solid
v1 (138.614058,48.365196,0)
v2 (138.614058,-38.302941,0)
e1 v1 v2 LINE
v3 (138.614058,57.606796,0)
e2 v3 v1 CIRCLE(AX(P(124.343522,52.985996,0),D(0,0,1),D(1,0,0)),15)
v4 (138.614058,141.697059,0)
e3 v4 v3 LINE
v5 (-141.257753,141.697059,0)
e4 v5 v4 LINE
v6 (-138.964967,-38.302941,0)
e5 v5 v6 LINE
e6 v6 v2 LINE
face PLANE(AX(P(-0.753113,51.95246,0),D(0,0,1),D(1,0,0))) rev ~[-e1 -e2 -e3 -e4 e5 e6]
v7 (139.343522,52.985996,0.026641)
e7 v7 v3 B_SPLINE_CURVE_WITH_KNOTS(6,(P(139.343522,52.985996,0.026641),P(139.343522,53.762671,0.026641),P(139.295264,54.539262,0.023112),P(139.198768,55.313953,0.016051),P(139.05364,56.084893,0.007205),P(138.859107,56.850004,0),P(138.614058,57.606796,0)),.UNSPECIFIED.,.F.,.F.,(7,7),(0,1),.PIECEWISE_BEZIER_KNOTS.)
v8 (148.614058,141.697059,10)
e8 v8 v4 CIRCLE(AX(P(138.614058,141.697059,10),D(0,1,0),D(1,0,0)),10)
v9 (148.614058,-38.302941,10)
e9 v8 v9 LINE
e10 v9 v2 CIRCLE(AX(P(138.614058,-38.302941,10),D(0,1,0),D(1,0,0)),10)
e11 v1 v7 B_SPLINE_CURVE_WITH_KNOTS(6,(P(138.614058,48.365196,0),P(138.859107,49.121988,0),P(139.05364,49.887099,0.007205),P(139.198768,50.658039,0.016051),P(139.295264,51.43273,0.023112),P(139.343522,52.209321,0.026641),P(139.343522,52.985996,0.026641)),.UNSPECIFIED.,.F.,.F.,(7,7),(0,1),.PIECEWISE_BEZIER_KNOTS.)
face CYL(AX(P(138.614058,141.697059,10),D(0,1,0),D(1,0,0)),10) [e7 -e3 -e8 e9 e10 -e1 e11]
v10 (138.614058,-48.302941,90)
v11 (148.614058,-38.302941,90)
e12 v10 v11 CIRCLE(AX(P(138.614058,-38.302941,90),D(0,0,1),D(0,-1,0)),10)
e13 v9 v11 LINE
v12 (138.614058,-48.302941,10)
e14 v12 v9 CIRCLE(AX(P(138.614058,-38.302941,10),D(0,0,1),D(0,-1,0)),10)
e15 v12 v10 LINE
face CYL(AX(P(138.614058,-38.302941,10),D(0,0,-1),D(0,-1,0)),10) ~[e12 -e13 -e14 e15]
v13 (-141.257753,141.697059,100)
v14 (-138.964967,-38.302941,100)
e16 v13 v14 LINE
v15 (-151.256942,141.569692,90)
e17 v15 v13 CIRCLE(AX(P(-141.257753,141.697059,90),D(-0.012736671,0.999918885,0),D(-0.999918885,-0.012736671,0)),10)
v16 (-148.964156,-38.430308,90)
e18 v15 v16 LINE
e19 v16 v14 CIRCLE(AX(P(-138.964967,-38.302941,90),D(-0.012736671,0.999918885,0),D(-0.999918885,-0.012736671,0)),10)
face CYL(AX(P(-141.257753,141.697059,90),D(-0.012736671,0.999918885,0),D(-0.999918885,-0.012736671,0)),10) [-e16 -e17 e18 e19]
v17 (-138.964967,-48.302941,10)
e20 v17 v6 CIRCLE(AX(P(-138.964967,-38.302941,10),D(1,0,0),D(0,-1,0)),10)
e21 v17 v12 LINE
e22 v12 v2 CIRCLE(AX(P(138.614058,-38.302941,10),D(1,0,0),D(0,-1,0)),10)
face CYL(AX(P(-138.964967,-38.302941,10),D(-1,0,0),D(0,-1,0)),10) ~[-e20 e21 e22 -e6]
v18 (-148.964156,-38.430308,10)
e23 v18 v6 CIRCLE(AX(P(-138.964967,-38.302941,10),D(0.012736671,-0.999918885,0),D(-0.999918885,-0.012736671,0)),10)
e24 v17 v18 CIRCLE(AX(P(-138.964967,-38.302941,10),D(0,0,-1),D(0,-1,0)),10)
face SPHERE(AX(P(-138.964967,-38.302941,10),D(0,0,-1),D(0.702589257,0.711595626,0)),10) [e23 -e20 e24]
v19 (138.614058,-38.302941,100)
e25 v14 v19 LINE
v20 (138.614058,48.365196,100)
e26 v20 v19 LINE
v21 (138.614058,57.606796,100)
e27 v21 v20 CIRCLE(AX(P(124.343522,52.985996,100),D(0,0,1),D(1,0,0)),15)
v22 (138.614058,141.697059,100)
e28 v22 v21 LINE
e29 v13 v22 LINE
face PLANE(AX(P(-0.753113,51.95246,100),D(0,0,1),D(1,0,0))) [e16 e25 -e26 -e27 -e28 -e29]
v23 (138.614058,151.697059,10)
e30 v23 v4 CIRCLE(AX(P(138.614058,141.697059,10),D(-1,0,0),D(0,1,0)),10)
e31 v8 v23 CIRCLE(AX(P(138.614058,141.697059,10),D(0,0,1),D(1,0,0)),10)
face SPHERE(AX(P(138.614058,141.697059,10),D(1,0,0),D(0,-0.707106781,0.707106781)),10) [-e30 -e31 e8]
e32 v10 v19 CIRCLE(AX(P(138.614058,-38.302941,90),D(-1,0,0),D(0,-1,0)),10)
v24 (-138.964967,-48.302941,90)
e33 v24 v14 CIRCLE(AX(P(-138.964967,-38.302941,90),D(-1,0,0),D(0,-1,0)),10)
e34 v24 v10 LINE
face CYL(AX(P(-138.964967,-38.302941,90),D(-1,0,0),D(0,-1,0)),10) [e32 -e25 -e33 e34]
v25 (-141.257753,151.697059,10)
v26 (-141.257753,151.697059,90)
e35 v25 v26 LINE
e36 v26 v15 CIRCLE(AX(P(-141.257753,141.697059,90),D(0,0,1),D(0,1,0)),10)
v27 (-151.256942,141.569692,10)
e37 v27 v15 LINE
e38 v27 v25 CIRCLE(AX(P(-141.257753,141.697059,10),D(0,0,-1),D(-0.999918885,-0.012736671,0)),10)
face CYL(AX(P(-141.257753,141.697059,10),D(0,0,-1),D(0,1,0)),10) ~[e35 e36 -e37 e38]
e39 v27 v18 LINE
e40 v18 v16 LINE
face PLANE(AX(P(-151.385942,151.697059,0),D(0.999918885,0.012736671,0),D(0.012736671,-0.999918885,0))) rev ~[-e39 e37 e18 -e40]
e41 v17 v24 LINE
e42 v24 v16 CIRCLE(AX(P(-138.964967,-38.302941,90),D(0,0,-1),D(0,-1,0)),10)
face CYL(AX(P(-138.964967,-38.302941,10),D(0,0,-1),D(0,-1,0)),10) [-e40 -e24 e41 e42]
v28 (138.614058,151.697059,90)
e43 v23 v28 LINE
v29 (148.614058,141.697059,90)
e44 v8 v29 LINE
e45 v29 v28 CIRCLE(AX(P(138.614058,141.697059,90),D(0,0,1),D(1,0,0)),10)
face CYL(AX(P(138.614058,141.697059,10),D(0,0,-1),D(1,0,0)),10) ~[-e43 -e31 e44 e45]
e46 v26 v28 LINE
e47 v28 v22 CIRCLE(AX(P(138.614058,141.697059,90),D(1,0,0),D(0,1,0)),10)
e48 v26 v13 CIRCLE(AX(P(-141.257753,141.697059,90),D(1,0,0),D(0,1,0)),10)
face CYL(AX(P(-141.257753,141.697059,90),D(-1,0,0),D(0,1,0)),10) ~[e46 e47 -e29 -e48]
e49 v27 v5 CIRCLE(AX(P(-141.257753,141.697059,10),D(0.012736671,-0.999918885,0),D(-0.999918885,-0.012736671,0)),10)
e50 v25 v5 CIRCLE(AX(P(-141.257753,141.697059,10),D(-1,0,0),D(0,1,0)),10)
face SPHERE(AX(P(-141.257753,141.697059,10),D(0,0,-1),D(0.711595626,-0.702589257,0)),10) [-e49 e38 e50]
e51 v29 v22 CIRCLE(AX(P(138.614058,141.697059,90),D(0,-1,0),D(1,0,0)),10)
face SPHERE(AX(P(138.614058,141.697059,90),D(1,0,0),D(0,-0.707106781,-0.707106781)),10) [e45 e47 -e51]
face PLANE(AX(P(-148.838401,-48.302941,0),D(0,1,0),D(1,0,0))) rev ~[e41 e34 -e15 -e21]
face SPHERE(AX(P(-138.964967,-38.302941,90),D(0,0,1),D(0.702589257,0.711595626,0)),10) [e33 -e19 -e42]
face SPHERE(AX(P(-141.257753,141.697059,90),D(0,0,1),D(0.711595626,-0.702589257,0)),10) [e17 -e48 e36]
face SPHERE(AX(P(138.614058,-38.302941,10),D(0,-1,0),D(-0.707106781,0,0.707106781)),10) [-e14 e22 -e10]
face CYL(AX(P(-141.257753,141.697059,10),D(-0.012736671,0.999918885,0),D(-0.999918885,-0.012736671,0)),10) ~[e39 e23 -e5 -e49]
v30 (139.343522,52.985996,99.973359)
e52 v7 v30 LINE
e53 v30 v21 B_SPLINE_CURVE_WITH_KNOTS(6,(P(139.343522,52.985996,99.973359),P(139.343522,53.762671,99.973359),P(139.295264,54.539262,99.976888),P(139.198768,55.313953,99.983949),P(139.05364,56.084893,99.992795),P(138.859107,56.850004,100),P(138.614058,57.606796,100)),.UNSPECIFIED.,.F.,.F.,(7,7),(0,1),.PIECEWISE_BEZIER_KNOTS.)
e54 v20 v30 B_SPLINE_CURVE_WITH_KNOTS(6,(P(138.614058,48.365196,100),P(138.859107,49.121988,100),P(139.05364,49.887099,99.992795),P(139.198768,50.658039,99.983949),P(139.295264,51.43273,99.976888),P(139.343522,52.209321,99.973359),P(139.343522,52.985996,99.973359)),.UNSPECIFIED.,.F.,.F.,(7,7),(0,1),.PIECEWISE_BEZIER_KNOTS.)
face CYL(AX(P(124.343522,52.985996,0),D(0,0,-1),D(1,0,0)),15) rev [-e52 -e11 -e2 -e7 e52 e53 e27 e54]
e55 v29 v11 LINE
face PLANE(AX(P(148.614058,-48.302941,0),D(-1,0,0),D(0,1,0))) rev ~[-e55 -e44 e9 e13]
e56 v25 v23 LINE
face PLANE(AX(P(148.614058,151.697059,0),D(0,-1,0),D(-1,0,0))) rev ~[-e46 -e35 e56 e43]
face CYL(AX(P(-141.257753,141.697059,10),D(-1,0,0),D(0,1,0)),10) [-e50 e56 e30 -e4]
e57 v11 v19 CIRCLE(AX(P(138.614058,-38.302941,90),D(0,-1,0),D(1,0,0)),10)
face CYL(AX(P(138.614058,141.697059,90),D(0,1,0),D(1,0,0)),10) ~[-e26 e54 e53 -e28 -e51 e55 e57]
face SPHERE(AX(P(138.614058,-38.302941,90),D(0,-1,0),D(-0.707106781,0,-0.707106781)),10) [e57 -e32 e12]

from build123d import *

# Parameters (mm, degrees)
F0_R         = 15
F1_DEPTH     = 100
F2_T1_DEPTH  = 180
F2_T3_DEPTH  = 277.5790250274
F2_T5_DEPTH  = 80
F2_T7_DEPTH  = 279.8718117474
F2_T9_DEPTH  = 180.014601827
F2_S13_W     = 10
F2_S13_H     = 10
F2_T14_DEPTH = 10
F2_S19_W     = 10
F2_S19_H     = 10
F2_T20_DEPTH = 10
F2_T26_DEPTH = 10
F2_S31_W     = 10
F2_S31_H     = 10
F2_T32_DEPTH = 10
F2_T38_DEPTH = 10
F2_S43_W     = 10
F2_S43_H     = 10
F2_T44_DEPTH = 10
F2_T50_DEPTH = 10
F2_T56_DEPTH = 10


# Not quite as in the source:
# - a fillet or chamfer that OpenCascade refuses, or shapes differently, is made with other operations: its cross-section is extruded or revolved along the edge and cut away or added


with BuildPart() as f1:
    # F0 (on Top) → F1 (new body)
    with BuildSketch(Plane.XY):
        Polygon((148.6140583592, 151.6970589757), (-151.3859416408, 151.6970589757), (-148.8384008408, -48.3029410243), (148.6140583592, -48.3029410243), align=None)
        with Locations((124.343521893, 52.9859960079)):
            Circle(F0_R, mode=Mode.SUBTRACT)
    extrude(amount=F1_DEPTH)

    # F2: fillet of radius 10 on 12 edges, made by hand

    # F2_s2 → F2_t1 (cut)
    with BuildSketch(Plane.XZ.offset(-141.6970589757)):
        with BuildLine():
            ThreePointArc((148.6140583592, 90), (145.6851261711, 97.0710678119), (138.6140583592, 100))
            Line((138.6140583592, 100), (148.6140583592, 100))
            Line((148.6140583592, 100), (148.6140583592, 90))
        make_face()
        with BuildLine():
            ThreePointArc((148.6140583592, 10), (145.6851261711, 2.9289321881), (138.6140583592, 0))
            Line((138.6140583592, 0), (148.6140583592, 0))
            Line((148.6140583592, 0), (148.6140583592, 10))
        make_face()
    extrude(amount=F2_T1_DEPTH, mode=Mode.SUBTRACT)

    # F2_s4 → F2_t3 (cut)
    with BuildSketch(Plane.YZ.offset(-138.9649666681)):
        with BuildLine():
            ThreePointArc((-48.3029410243, 90), (-45.3740088362, 97.0710678119), (-38.3029410243, 100))
            Line((-38.3029410243, 100), (-48.3029410243, 100))
            Line((-48.3029410243, 100), (-48.3029410243, 90))
        make_face()
        with BuildLine():
            ThreePointArc((-48.3029410243, 10), (-45.3740088362, 2.9289321881), (-38.3029410243, 0))
            Line((-38.3029410243, 0), (-48.3029410243, 0))
            Line((-48.3029410243, 0), (-48.3029410243, 10))
        make_face()
    extrude(amount=F2_T3_DEPTH, mode=Mode.SUBTRACT)

    # F2_s6 → F2_t5 (cut)
    with BuildSketch(Plane.XY.offset(10)):
        with BuildLine():
            ThreePointArc((138.6140583592, -48.3029410243), (145.6851261711, -45.3740088362), (148.6140583592, -38.3029410243))
            Line((148.6140583592, -38.3029410243), (148.6140583592, -48.3029410243))
            Line((148.6140583592, -48.3029410243), (138.6140583592, -48.3029410243))
        make_face()
        with BuildLine():
            ThreePointArc((148.6140583592, 141.6970589757), (145.6851261711, 148.7681267876), (138.6140583592, 151.6970589757))
            Line((138.6140583592, 151.6970589757), (148.6140583592, 151.6970589757))
            Line((148.6140583592, 151.6970589757), (148.6140583592, 141.6970589757))
        make_face()
        with BuildLine():
            ThreePointArc((-138.9649666681, -48.3029410243), (-145.9908592421, -45.4188972875), (-148.9641555213, -38.4303077322))
            Line((-148.9641555213, -38.4303077322), (-148.8384008408, -48.3029410243))
            Line((-148.8384008408, -48.3029410243), (-138.9649666681, -48.3029410243))
        make_face()
        with BuildLine():
            ThreePointArc((-141.2577533882, 151.6970589757), (-148.3737096513, 148.7229515496), (-151.2569422414, 141.5696922678))
            Line((-151.2569422414, 141.5696922678), (-151.3859416408, 151.6970589757))
            Line((-151.3859416408, 151.6970589757), (-141.2577533882, 151.6970589757))
        make_face()
    extrude(amount=F2_T5_DEPTH, mode=Mode.SUBTRACT)

    # F2_s8 → F2_t7 (cut)
    with BuildSketch(Plane.YZ.offset(-141.2577533882)):
        with BuildLine():
            ThreePointArc((151.6970589757, 10), (148.7681267876, 2.9289321881), (141.6970589757, 0))
            Line((141.6970589757, 0), (151.6970589757, 0))
            Line((151.6970589757, 0), (151.6970589757, 10))
        make_face()
        with BuildLine():
            ThreePointArc((151.6970589757, 90), (148.7681267876, 97.0710678119), (141.6970589757, 100))
            Line((141.6970589757, 100), (151.6970589757, 100))
            Line((151.6970589757, 100), (151.6970589757, 90))
        make_face()
    extrude(amount=F2_T7_DEPTH, mode=Mode.SUBTRACT)

    # F2_s10 → F2_t9 (cut)
    with BuildSketch(Plane(origin=(-1.8275176256, 143.4730800475, 0), x_dir=(0, 0, 1), z_dir=(0.0127366708, -0.9999188853, 0))):
        with BuildLine():
            ThreePointArc((10, 149.4415465191), (2.9289321881, 146.512614331), (0, 139.4415465191))
            Line((0, 139.4415465191), (0, 149.4415465191))
            Line((0, 149.4415465191), (10, 149.4415465191))
        make_face()
        with BuildLine():
            ThreePointArc((90, 149.4415465191), (97.0710678119, 146.512614331), (100, 139.4415465191))
            Line((100, 139.4415465191), (100, 149.4415465191))
            Line((100, 149.4415465191), (90, 149.4415465191))
        make_face()
    extrude(amount=F2_T9_DEPTH, mode=Mode.SUBTRACT)


with BuildPart() as f2_tool12:
    # F2_s13 → F2_t14 (new body)
    with BuildSketch(Plane.XZ.offset(38.3029410243)):
        with Locations((143.6140583592, 95)):
            Rectangle(F2_S13_W, F2_S13_H)
    extrude(amount=F2_T14_DEPTH)

    # F2_s15 → F2_t16 (revolve, cut)
    with BuildSketch(Plane(origin=(138.6140583592, -38.3029410243, 90), x_dir=(-0.7071067812, 0, -0.7071067812), z_dir=(-0.7071067812, 0, 0.7071067812))):
        with BuildLine():
            ThreePointArc((0, -10), (10, 0), (0, 10))
            Line((0, 10), (0, -10))
        make_face()
    revolve(axis=Axis((138.6140583592, -38.3029410243, 90), (0, -1, 0)), mode=Mode.SUBTRACT)


with BuildPart() as f1_1:
    add(f1.part)

    # F2_t11: cut F2_tool12
    add(f2_tool12.part, mode=Mode.SUBTRACT)


with BuildPart() as f2_tool18:
    # F2_s19 → F2_t20 (new body)
    with BuildSketch(Plane.YZ.offset(138.6140583592)):
        with Locations((146.6970589757, 95)):
            Rectangle(F2_S19_W, F2_S19_H)
    extrude(amount=F2_T20_DEPTH)

    # F2_s21 → F2_t22 (revolve, cut)
    with BuildSketch(Plane(origin=(138.6140583592, 141.6970589757, 90), x_dir=(0, -0.7071067812, -0.7071067812), z_dir=(0, -0.7071067812, 0.7071067812))):
        with BuildLine():
            ThreePointArc((0, -10), (10, 0), (0, 10))
            Line((0, 10), (0, -10))
        make_face()
    revolve(axis=Axis((138.6140583592, 141.6970589757, 90), (1, 0, 0)), mode=Mode.SUBTRACT)


with BuildPart() as f1_2:
    add(f1_1.part)

    # F2_t17: cut F2_tool18
    add(f2_tool18.part, mode=Mode.SUBTRACT)


with BuildPart() as f2_tool24:
    # F2_s25 → F2_t26 (new body)
    with BuildSketch(Plane.XY.offset(90)):
        Polygon((-138.9649666681, -38.3029410243), (-138.9649666681, -48.3029410243), (-148.8384008408, -48.3029410243), (-148.9641555213, -38.4303077322), align=None)
    extrude(amount=F2_T26_DEPTH)

    # F2_s27 → F2_t28 (revolve, cut)
    with BuildSketch(Plane(origin=(-138.9649666681, -38.3029410243, 90), x_dir=(0.7025892574, 0.7115956263, 0), z_dir=(0.7115956263, -0.7025892574, 0))):
        with BuildLine():
            ThreePointArc((0, -10), (10, 0), (0, 10))
            Line((0, 10), (0, -10))
        make_face()
    revolve(axis=Axis((-138.9649666681, -38.3029410243, 90), (0, 0, 1)), mode=Mode.SUBTRACT)


with BuildPart() as f1_3:
    add(f1_2.part)

    # F2_t23: cut F2_tool24
    add(f2_tool24.part, mode=Mode.SUBTRACT)


with BuildPart() as f2_tool30:
    # F2_s31 → F2_t32 (new body)
    with BuildSketch(Plane.XZ.offset(38.3029410243)):
        with Locations((143.6140583592, 5)):
            Rectangle(F2_S31_W, F2_S31_H)
    extrude(amount=F2_T32_DEPTH)

    # F2_s33 → F2_t34 (revolve, cut)
    with BuildSketch(Plane(origin=(138.6140583592, -38.3029410243, 10), x_dir=(-0.7071067812, 0, 0.7071067812), z_dir=(0.7071067812, 0, 0.7071067812))):
        with BuildLine():
            ThreePointArc((0, -10), (10, 0), (0, 10))
            Line((0, 10), (0, -10))
        make_face()
    revolve(axis=Axis((138.6140583592, -38.3029410243, 10), (0, -1, 0)), mode=Mode.SUBTRACT)


with BuildPart() as f1_4:
    add(f1_3.part)

    # F2_t29: cut F2_tool30
    add(f2_tool30.part, mode=Mode.SUBTRACT)


with BuildPart() as f2_tool36:
    # F2_s37 → F2_t38 (new body)
    with BuildSketch(Plane.XY.offset(10)):
        Polygon((-138.9649666681, -38.3029410243), (-138.9649666681, -48.3029410243), (-148.8384008408, -48.3029410243), (-148.9641555213, -38.4303077322), align=None)
    extrude(amount=-F2_T38_DEPTH)

    # F2_s39 → F2_t40 (revolve, cut)
    with BuildSketch(Plane(origin=(-138.9649666681, -38.3029410243, 10), x_dir=(0.7025892574, 0.7115956263, 0), z_dir=(-0.7115956263, 0.7025892574, 0))):
        with BuildLine():
            ThreePointArc((0, -10), (10, 0), (0, 10))
            Line((0, 10), (0, -10))
        make_face()
    revolve(axis=Axis((-138.9649666681, -38.3029410243, 10), (0, 0, -1)), mode=Mode.SUBTRACT)


with BuildPart() as f1_5:
    add(f1_4.part)

    # F2_t35: cut F2_tool36
    add(f2_tool36.part, mode=Mode.SUBTRACT)


with BuildPart() as f2_tool42:
    # F2_s43 → F2_t44 (new body)
    with BuildSketch(Plane.YZ.offset(138.6140583592)):
        with Locations((146.6970589757, 5)):
            Rectangle(F2_S43_W, F2_S43_H)
    extrude(amount=F2_T44_DEPTH)

    # F2_s45 → F2_t46 (revolve, cut)
    with BuildSketch(Plane(origin=(138.6140583592, 141.6970589757, 10), x_dir=(0, -0.7071067812, 0.7071067812), z_dir=(0, 0.7071067812, 0.7071067812))):
        with BuildLine():
            ThreePointArc((0, -10), (10, 0), (0, 10))
            Line((0, 10), (0, -10))
        make_face()
    revolve(axis=Axis((138.6140583592, 141.6970589757, 10), (1, 0, 0)), mode=Mode.SUBTRACT)


with BuildPart() as f1_6:
    add(f1_5.part)

    # F2_t41: cut F2_tool42
    add(f2_tool42.part, mode=Mode.SUBTRACT)


with BuildPart() as f2_tool48:
    # F2_s49 → F2_t50 (new body)
    with BuildSketch(Plane.XY.offset(10)):
        Polygon((-141.2577533882, 141.6970589757), (-141.2577533882, 151.6970589757), (-151.3859416408, 151.6970589757), (-151.2569422414, 141.5696922678), align=None)
    extrude(amount=-F2_T50_DEPTH)

    # F2_s51 → F2_t52 (revolve, cut)
    with BuildSketch(Plane(origin=(-141.2577533882, 141.6970589757, 10), x_dir=(0.7115956263, -0.7025892574, 0), z_dir=(0.7025892574, 0.7115956263, 0))):
        with BuildLine():
            ThreePointArc((0, -10), (10, 0), (0, 10))
            Line((0, 10), (0, -10))
        make_face()
    revolve(axis=Axis((-141.2577533882, 141.6970589757, 10), (0, 0, -1)), mode=Mode.SUBTRACT)


with BuildPart() as f1_7:
    add(f1_6.part)

    # F2_t47: cut F2_tool48
    add(f2_tool48.part, mode=Mode.SUBTRACT)


with BuildPart() as f2_tool54:
    # F2_s55 → F2_t56 (new body)
    with BuildSketch(Plane.XY.offset(90)):
        Polygon((-141.2577533882, 141.6970589757), (-141.2577533882, 151.6970589757), (-151.3859416408, 151.6970589757), (-151.2569422414, 141.5696922678), align=None)
    extrude(amount=F2_T56_DEPTH)

    # F2_s57 → F2_t58 (revolve, cut)
    with BuildSketch(Plane(origin=(-141.2577533882, 141.6970589757, 90), x_dir=(0.7115956263, -0.7025892574, 0), z_dir=(-0.7025892574, -0.7115956263, 0))):
        with BuildLine():
            ThreePointArc((0, -10), (10, 0), (0, 10))
            Line((0, 10), (0, -10))
        make_face()
    revolve(axis=Axis((-141.2577533882, 141.6970589757, 90), (0, 0, 1)), mode=Mode.SUBTRACT)


with BuildPart() as f1_8:
    add(f1_7.part)

    # F2_t53: cut F2_tool54
    add(f2_tool54.part, mode=Mode.SUBTRACT)


solid = f1_8.part
